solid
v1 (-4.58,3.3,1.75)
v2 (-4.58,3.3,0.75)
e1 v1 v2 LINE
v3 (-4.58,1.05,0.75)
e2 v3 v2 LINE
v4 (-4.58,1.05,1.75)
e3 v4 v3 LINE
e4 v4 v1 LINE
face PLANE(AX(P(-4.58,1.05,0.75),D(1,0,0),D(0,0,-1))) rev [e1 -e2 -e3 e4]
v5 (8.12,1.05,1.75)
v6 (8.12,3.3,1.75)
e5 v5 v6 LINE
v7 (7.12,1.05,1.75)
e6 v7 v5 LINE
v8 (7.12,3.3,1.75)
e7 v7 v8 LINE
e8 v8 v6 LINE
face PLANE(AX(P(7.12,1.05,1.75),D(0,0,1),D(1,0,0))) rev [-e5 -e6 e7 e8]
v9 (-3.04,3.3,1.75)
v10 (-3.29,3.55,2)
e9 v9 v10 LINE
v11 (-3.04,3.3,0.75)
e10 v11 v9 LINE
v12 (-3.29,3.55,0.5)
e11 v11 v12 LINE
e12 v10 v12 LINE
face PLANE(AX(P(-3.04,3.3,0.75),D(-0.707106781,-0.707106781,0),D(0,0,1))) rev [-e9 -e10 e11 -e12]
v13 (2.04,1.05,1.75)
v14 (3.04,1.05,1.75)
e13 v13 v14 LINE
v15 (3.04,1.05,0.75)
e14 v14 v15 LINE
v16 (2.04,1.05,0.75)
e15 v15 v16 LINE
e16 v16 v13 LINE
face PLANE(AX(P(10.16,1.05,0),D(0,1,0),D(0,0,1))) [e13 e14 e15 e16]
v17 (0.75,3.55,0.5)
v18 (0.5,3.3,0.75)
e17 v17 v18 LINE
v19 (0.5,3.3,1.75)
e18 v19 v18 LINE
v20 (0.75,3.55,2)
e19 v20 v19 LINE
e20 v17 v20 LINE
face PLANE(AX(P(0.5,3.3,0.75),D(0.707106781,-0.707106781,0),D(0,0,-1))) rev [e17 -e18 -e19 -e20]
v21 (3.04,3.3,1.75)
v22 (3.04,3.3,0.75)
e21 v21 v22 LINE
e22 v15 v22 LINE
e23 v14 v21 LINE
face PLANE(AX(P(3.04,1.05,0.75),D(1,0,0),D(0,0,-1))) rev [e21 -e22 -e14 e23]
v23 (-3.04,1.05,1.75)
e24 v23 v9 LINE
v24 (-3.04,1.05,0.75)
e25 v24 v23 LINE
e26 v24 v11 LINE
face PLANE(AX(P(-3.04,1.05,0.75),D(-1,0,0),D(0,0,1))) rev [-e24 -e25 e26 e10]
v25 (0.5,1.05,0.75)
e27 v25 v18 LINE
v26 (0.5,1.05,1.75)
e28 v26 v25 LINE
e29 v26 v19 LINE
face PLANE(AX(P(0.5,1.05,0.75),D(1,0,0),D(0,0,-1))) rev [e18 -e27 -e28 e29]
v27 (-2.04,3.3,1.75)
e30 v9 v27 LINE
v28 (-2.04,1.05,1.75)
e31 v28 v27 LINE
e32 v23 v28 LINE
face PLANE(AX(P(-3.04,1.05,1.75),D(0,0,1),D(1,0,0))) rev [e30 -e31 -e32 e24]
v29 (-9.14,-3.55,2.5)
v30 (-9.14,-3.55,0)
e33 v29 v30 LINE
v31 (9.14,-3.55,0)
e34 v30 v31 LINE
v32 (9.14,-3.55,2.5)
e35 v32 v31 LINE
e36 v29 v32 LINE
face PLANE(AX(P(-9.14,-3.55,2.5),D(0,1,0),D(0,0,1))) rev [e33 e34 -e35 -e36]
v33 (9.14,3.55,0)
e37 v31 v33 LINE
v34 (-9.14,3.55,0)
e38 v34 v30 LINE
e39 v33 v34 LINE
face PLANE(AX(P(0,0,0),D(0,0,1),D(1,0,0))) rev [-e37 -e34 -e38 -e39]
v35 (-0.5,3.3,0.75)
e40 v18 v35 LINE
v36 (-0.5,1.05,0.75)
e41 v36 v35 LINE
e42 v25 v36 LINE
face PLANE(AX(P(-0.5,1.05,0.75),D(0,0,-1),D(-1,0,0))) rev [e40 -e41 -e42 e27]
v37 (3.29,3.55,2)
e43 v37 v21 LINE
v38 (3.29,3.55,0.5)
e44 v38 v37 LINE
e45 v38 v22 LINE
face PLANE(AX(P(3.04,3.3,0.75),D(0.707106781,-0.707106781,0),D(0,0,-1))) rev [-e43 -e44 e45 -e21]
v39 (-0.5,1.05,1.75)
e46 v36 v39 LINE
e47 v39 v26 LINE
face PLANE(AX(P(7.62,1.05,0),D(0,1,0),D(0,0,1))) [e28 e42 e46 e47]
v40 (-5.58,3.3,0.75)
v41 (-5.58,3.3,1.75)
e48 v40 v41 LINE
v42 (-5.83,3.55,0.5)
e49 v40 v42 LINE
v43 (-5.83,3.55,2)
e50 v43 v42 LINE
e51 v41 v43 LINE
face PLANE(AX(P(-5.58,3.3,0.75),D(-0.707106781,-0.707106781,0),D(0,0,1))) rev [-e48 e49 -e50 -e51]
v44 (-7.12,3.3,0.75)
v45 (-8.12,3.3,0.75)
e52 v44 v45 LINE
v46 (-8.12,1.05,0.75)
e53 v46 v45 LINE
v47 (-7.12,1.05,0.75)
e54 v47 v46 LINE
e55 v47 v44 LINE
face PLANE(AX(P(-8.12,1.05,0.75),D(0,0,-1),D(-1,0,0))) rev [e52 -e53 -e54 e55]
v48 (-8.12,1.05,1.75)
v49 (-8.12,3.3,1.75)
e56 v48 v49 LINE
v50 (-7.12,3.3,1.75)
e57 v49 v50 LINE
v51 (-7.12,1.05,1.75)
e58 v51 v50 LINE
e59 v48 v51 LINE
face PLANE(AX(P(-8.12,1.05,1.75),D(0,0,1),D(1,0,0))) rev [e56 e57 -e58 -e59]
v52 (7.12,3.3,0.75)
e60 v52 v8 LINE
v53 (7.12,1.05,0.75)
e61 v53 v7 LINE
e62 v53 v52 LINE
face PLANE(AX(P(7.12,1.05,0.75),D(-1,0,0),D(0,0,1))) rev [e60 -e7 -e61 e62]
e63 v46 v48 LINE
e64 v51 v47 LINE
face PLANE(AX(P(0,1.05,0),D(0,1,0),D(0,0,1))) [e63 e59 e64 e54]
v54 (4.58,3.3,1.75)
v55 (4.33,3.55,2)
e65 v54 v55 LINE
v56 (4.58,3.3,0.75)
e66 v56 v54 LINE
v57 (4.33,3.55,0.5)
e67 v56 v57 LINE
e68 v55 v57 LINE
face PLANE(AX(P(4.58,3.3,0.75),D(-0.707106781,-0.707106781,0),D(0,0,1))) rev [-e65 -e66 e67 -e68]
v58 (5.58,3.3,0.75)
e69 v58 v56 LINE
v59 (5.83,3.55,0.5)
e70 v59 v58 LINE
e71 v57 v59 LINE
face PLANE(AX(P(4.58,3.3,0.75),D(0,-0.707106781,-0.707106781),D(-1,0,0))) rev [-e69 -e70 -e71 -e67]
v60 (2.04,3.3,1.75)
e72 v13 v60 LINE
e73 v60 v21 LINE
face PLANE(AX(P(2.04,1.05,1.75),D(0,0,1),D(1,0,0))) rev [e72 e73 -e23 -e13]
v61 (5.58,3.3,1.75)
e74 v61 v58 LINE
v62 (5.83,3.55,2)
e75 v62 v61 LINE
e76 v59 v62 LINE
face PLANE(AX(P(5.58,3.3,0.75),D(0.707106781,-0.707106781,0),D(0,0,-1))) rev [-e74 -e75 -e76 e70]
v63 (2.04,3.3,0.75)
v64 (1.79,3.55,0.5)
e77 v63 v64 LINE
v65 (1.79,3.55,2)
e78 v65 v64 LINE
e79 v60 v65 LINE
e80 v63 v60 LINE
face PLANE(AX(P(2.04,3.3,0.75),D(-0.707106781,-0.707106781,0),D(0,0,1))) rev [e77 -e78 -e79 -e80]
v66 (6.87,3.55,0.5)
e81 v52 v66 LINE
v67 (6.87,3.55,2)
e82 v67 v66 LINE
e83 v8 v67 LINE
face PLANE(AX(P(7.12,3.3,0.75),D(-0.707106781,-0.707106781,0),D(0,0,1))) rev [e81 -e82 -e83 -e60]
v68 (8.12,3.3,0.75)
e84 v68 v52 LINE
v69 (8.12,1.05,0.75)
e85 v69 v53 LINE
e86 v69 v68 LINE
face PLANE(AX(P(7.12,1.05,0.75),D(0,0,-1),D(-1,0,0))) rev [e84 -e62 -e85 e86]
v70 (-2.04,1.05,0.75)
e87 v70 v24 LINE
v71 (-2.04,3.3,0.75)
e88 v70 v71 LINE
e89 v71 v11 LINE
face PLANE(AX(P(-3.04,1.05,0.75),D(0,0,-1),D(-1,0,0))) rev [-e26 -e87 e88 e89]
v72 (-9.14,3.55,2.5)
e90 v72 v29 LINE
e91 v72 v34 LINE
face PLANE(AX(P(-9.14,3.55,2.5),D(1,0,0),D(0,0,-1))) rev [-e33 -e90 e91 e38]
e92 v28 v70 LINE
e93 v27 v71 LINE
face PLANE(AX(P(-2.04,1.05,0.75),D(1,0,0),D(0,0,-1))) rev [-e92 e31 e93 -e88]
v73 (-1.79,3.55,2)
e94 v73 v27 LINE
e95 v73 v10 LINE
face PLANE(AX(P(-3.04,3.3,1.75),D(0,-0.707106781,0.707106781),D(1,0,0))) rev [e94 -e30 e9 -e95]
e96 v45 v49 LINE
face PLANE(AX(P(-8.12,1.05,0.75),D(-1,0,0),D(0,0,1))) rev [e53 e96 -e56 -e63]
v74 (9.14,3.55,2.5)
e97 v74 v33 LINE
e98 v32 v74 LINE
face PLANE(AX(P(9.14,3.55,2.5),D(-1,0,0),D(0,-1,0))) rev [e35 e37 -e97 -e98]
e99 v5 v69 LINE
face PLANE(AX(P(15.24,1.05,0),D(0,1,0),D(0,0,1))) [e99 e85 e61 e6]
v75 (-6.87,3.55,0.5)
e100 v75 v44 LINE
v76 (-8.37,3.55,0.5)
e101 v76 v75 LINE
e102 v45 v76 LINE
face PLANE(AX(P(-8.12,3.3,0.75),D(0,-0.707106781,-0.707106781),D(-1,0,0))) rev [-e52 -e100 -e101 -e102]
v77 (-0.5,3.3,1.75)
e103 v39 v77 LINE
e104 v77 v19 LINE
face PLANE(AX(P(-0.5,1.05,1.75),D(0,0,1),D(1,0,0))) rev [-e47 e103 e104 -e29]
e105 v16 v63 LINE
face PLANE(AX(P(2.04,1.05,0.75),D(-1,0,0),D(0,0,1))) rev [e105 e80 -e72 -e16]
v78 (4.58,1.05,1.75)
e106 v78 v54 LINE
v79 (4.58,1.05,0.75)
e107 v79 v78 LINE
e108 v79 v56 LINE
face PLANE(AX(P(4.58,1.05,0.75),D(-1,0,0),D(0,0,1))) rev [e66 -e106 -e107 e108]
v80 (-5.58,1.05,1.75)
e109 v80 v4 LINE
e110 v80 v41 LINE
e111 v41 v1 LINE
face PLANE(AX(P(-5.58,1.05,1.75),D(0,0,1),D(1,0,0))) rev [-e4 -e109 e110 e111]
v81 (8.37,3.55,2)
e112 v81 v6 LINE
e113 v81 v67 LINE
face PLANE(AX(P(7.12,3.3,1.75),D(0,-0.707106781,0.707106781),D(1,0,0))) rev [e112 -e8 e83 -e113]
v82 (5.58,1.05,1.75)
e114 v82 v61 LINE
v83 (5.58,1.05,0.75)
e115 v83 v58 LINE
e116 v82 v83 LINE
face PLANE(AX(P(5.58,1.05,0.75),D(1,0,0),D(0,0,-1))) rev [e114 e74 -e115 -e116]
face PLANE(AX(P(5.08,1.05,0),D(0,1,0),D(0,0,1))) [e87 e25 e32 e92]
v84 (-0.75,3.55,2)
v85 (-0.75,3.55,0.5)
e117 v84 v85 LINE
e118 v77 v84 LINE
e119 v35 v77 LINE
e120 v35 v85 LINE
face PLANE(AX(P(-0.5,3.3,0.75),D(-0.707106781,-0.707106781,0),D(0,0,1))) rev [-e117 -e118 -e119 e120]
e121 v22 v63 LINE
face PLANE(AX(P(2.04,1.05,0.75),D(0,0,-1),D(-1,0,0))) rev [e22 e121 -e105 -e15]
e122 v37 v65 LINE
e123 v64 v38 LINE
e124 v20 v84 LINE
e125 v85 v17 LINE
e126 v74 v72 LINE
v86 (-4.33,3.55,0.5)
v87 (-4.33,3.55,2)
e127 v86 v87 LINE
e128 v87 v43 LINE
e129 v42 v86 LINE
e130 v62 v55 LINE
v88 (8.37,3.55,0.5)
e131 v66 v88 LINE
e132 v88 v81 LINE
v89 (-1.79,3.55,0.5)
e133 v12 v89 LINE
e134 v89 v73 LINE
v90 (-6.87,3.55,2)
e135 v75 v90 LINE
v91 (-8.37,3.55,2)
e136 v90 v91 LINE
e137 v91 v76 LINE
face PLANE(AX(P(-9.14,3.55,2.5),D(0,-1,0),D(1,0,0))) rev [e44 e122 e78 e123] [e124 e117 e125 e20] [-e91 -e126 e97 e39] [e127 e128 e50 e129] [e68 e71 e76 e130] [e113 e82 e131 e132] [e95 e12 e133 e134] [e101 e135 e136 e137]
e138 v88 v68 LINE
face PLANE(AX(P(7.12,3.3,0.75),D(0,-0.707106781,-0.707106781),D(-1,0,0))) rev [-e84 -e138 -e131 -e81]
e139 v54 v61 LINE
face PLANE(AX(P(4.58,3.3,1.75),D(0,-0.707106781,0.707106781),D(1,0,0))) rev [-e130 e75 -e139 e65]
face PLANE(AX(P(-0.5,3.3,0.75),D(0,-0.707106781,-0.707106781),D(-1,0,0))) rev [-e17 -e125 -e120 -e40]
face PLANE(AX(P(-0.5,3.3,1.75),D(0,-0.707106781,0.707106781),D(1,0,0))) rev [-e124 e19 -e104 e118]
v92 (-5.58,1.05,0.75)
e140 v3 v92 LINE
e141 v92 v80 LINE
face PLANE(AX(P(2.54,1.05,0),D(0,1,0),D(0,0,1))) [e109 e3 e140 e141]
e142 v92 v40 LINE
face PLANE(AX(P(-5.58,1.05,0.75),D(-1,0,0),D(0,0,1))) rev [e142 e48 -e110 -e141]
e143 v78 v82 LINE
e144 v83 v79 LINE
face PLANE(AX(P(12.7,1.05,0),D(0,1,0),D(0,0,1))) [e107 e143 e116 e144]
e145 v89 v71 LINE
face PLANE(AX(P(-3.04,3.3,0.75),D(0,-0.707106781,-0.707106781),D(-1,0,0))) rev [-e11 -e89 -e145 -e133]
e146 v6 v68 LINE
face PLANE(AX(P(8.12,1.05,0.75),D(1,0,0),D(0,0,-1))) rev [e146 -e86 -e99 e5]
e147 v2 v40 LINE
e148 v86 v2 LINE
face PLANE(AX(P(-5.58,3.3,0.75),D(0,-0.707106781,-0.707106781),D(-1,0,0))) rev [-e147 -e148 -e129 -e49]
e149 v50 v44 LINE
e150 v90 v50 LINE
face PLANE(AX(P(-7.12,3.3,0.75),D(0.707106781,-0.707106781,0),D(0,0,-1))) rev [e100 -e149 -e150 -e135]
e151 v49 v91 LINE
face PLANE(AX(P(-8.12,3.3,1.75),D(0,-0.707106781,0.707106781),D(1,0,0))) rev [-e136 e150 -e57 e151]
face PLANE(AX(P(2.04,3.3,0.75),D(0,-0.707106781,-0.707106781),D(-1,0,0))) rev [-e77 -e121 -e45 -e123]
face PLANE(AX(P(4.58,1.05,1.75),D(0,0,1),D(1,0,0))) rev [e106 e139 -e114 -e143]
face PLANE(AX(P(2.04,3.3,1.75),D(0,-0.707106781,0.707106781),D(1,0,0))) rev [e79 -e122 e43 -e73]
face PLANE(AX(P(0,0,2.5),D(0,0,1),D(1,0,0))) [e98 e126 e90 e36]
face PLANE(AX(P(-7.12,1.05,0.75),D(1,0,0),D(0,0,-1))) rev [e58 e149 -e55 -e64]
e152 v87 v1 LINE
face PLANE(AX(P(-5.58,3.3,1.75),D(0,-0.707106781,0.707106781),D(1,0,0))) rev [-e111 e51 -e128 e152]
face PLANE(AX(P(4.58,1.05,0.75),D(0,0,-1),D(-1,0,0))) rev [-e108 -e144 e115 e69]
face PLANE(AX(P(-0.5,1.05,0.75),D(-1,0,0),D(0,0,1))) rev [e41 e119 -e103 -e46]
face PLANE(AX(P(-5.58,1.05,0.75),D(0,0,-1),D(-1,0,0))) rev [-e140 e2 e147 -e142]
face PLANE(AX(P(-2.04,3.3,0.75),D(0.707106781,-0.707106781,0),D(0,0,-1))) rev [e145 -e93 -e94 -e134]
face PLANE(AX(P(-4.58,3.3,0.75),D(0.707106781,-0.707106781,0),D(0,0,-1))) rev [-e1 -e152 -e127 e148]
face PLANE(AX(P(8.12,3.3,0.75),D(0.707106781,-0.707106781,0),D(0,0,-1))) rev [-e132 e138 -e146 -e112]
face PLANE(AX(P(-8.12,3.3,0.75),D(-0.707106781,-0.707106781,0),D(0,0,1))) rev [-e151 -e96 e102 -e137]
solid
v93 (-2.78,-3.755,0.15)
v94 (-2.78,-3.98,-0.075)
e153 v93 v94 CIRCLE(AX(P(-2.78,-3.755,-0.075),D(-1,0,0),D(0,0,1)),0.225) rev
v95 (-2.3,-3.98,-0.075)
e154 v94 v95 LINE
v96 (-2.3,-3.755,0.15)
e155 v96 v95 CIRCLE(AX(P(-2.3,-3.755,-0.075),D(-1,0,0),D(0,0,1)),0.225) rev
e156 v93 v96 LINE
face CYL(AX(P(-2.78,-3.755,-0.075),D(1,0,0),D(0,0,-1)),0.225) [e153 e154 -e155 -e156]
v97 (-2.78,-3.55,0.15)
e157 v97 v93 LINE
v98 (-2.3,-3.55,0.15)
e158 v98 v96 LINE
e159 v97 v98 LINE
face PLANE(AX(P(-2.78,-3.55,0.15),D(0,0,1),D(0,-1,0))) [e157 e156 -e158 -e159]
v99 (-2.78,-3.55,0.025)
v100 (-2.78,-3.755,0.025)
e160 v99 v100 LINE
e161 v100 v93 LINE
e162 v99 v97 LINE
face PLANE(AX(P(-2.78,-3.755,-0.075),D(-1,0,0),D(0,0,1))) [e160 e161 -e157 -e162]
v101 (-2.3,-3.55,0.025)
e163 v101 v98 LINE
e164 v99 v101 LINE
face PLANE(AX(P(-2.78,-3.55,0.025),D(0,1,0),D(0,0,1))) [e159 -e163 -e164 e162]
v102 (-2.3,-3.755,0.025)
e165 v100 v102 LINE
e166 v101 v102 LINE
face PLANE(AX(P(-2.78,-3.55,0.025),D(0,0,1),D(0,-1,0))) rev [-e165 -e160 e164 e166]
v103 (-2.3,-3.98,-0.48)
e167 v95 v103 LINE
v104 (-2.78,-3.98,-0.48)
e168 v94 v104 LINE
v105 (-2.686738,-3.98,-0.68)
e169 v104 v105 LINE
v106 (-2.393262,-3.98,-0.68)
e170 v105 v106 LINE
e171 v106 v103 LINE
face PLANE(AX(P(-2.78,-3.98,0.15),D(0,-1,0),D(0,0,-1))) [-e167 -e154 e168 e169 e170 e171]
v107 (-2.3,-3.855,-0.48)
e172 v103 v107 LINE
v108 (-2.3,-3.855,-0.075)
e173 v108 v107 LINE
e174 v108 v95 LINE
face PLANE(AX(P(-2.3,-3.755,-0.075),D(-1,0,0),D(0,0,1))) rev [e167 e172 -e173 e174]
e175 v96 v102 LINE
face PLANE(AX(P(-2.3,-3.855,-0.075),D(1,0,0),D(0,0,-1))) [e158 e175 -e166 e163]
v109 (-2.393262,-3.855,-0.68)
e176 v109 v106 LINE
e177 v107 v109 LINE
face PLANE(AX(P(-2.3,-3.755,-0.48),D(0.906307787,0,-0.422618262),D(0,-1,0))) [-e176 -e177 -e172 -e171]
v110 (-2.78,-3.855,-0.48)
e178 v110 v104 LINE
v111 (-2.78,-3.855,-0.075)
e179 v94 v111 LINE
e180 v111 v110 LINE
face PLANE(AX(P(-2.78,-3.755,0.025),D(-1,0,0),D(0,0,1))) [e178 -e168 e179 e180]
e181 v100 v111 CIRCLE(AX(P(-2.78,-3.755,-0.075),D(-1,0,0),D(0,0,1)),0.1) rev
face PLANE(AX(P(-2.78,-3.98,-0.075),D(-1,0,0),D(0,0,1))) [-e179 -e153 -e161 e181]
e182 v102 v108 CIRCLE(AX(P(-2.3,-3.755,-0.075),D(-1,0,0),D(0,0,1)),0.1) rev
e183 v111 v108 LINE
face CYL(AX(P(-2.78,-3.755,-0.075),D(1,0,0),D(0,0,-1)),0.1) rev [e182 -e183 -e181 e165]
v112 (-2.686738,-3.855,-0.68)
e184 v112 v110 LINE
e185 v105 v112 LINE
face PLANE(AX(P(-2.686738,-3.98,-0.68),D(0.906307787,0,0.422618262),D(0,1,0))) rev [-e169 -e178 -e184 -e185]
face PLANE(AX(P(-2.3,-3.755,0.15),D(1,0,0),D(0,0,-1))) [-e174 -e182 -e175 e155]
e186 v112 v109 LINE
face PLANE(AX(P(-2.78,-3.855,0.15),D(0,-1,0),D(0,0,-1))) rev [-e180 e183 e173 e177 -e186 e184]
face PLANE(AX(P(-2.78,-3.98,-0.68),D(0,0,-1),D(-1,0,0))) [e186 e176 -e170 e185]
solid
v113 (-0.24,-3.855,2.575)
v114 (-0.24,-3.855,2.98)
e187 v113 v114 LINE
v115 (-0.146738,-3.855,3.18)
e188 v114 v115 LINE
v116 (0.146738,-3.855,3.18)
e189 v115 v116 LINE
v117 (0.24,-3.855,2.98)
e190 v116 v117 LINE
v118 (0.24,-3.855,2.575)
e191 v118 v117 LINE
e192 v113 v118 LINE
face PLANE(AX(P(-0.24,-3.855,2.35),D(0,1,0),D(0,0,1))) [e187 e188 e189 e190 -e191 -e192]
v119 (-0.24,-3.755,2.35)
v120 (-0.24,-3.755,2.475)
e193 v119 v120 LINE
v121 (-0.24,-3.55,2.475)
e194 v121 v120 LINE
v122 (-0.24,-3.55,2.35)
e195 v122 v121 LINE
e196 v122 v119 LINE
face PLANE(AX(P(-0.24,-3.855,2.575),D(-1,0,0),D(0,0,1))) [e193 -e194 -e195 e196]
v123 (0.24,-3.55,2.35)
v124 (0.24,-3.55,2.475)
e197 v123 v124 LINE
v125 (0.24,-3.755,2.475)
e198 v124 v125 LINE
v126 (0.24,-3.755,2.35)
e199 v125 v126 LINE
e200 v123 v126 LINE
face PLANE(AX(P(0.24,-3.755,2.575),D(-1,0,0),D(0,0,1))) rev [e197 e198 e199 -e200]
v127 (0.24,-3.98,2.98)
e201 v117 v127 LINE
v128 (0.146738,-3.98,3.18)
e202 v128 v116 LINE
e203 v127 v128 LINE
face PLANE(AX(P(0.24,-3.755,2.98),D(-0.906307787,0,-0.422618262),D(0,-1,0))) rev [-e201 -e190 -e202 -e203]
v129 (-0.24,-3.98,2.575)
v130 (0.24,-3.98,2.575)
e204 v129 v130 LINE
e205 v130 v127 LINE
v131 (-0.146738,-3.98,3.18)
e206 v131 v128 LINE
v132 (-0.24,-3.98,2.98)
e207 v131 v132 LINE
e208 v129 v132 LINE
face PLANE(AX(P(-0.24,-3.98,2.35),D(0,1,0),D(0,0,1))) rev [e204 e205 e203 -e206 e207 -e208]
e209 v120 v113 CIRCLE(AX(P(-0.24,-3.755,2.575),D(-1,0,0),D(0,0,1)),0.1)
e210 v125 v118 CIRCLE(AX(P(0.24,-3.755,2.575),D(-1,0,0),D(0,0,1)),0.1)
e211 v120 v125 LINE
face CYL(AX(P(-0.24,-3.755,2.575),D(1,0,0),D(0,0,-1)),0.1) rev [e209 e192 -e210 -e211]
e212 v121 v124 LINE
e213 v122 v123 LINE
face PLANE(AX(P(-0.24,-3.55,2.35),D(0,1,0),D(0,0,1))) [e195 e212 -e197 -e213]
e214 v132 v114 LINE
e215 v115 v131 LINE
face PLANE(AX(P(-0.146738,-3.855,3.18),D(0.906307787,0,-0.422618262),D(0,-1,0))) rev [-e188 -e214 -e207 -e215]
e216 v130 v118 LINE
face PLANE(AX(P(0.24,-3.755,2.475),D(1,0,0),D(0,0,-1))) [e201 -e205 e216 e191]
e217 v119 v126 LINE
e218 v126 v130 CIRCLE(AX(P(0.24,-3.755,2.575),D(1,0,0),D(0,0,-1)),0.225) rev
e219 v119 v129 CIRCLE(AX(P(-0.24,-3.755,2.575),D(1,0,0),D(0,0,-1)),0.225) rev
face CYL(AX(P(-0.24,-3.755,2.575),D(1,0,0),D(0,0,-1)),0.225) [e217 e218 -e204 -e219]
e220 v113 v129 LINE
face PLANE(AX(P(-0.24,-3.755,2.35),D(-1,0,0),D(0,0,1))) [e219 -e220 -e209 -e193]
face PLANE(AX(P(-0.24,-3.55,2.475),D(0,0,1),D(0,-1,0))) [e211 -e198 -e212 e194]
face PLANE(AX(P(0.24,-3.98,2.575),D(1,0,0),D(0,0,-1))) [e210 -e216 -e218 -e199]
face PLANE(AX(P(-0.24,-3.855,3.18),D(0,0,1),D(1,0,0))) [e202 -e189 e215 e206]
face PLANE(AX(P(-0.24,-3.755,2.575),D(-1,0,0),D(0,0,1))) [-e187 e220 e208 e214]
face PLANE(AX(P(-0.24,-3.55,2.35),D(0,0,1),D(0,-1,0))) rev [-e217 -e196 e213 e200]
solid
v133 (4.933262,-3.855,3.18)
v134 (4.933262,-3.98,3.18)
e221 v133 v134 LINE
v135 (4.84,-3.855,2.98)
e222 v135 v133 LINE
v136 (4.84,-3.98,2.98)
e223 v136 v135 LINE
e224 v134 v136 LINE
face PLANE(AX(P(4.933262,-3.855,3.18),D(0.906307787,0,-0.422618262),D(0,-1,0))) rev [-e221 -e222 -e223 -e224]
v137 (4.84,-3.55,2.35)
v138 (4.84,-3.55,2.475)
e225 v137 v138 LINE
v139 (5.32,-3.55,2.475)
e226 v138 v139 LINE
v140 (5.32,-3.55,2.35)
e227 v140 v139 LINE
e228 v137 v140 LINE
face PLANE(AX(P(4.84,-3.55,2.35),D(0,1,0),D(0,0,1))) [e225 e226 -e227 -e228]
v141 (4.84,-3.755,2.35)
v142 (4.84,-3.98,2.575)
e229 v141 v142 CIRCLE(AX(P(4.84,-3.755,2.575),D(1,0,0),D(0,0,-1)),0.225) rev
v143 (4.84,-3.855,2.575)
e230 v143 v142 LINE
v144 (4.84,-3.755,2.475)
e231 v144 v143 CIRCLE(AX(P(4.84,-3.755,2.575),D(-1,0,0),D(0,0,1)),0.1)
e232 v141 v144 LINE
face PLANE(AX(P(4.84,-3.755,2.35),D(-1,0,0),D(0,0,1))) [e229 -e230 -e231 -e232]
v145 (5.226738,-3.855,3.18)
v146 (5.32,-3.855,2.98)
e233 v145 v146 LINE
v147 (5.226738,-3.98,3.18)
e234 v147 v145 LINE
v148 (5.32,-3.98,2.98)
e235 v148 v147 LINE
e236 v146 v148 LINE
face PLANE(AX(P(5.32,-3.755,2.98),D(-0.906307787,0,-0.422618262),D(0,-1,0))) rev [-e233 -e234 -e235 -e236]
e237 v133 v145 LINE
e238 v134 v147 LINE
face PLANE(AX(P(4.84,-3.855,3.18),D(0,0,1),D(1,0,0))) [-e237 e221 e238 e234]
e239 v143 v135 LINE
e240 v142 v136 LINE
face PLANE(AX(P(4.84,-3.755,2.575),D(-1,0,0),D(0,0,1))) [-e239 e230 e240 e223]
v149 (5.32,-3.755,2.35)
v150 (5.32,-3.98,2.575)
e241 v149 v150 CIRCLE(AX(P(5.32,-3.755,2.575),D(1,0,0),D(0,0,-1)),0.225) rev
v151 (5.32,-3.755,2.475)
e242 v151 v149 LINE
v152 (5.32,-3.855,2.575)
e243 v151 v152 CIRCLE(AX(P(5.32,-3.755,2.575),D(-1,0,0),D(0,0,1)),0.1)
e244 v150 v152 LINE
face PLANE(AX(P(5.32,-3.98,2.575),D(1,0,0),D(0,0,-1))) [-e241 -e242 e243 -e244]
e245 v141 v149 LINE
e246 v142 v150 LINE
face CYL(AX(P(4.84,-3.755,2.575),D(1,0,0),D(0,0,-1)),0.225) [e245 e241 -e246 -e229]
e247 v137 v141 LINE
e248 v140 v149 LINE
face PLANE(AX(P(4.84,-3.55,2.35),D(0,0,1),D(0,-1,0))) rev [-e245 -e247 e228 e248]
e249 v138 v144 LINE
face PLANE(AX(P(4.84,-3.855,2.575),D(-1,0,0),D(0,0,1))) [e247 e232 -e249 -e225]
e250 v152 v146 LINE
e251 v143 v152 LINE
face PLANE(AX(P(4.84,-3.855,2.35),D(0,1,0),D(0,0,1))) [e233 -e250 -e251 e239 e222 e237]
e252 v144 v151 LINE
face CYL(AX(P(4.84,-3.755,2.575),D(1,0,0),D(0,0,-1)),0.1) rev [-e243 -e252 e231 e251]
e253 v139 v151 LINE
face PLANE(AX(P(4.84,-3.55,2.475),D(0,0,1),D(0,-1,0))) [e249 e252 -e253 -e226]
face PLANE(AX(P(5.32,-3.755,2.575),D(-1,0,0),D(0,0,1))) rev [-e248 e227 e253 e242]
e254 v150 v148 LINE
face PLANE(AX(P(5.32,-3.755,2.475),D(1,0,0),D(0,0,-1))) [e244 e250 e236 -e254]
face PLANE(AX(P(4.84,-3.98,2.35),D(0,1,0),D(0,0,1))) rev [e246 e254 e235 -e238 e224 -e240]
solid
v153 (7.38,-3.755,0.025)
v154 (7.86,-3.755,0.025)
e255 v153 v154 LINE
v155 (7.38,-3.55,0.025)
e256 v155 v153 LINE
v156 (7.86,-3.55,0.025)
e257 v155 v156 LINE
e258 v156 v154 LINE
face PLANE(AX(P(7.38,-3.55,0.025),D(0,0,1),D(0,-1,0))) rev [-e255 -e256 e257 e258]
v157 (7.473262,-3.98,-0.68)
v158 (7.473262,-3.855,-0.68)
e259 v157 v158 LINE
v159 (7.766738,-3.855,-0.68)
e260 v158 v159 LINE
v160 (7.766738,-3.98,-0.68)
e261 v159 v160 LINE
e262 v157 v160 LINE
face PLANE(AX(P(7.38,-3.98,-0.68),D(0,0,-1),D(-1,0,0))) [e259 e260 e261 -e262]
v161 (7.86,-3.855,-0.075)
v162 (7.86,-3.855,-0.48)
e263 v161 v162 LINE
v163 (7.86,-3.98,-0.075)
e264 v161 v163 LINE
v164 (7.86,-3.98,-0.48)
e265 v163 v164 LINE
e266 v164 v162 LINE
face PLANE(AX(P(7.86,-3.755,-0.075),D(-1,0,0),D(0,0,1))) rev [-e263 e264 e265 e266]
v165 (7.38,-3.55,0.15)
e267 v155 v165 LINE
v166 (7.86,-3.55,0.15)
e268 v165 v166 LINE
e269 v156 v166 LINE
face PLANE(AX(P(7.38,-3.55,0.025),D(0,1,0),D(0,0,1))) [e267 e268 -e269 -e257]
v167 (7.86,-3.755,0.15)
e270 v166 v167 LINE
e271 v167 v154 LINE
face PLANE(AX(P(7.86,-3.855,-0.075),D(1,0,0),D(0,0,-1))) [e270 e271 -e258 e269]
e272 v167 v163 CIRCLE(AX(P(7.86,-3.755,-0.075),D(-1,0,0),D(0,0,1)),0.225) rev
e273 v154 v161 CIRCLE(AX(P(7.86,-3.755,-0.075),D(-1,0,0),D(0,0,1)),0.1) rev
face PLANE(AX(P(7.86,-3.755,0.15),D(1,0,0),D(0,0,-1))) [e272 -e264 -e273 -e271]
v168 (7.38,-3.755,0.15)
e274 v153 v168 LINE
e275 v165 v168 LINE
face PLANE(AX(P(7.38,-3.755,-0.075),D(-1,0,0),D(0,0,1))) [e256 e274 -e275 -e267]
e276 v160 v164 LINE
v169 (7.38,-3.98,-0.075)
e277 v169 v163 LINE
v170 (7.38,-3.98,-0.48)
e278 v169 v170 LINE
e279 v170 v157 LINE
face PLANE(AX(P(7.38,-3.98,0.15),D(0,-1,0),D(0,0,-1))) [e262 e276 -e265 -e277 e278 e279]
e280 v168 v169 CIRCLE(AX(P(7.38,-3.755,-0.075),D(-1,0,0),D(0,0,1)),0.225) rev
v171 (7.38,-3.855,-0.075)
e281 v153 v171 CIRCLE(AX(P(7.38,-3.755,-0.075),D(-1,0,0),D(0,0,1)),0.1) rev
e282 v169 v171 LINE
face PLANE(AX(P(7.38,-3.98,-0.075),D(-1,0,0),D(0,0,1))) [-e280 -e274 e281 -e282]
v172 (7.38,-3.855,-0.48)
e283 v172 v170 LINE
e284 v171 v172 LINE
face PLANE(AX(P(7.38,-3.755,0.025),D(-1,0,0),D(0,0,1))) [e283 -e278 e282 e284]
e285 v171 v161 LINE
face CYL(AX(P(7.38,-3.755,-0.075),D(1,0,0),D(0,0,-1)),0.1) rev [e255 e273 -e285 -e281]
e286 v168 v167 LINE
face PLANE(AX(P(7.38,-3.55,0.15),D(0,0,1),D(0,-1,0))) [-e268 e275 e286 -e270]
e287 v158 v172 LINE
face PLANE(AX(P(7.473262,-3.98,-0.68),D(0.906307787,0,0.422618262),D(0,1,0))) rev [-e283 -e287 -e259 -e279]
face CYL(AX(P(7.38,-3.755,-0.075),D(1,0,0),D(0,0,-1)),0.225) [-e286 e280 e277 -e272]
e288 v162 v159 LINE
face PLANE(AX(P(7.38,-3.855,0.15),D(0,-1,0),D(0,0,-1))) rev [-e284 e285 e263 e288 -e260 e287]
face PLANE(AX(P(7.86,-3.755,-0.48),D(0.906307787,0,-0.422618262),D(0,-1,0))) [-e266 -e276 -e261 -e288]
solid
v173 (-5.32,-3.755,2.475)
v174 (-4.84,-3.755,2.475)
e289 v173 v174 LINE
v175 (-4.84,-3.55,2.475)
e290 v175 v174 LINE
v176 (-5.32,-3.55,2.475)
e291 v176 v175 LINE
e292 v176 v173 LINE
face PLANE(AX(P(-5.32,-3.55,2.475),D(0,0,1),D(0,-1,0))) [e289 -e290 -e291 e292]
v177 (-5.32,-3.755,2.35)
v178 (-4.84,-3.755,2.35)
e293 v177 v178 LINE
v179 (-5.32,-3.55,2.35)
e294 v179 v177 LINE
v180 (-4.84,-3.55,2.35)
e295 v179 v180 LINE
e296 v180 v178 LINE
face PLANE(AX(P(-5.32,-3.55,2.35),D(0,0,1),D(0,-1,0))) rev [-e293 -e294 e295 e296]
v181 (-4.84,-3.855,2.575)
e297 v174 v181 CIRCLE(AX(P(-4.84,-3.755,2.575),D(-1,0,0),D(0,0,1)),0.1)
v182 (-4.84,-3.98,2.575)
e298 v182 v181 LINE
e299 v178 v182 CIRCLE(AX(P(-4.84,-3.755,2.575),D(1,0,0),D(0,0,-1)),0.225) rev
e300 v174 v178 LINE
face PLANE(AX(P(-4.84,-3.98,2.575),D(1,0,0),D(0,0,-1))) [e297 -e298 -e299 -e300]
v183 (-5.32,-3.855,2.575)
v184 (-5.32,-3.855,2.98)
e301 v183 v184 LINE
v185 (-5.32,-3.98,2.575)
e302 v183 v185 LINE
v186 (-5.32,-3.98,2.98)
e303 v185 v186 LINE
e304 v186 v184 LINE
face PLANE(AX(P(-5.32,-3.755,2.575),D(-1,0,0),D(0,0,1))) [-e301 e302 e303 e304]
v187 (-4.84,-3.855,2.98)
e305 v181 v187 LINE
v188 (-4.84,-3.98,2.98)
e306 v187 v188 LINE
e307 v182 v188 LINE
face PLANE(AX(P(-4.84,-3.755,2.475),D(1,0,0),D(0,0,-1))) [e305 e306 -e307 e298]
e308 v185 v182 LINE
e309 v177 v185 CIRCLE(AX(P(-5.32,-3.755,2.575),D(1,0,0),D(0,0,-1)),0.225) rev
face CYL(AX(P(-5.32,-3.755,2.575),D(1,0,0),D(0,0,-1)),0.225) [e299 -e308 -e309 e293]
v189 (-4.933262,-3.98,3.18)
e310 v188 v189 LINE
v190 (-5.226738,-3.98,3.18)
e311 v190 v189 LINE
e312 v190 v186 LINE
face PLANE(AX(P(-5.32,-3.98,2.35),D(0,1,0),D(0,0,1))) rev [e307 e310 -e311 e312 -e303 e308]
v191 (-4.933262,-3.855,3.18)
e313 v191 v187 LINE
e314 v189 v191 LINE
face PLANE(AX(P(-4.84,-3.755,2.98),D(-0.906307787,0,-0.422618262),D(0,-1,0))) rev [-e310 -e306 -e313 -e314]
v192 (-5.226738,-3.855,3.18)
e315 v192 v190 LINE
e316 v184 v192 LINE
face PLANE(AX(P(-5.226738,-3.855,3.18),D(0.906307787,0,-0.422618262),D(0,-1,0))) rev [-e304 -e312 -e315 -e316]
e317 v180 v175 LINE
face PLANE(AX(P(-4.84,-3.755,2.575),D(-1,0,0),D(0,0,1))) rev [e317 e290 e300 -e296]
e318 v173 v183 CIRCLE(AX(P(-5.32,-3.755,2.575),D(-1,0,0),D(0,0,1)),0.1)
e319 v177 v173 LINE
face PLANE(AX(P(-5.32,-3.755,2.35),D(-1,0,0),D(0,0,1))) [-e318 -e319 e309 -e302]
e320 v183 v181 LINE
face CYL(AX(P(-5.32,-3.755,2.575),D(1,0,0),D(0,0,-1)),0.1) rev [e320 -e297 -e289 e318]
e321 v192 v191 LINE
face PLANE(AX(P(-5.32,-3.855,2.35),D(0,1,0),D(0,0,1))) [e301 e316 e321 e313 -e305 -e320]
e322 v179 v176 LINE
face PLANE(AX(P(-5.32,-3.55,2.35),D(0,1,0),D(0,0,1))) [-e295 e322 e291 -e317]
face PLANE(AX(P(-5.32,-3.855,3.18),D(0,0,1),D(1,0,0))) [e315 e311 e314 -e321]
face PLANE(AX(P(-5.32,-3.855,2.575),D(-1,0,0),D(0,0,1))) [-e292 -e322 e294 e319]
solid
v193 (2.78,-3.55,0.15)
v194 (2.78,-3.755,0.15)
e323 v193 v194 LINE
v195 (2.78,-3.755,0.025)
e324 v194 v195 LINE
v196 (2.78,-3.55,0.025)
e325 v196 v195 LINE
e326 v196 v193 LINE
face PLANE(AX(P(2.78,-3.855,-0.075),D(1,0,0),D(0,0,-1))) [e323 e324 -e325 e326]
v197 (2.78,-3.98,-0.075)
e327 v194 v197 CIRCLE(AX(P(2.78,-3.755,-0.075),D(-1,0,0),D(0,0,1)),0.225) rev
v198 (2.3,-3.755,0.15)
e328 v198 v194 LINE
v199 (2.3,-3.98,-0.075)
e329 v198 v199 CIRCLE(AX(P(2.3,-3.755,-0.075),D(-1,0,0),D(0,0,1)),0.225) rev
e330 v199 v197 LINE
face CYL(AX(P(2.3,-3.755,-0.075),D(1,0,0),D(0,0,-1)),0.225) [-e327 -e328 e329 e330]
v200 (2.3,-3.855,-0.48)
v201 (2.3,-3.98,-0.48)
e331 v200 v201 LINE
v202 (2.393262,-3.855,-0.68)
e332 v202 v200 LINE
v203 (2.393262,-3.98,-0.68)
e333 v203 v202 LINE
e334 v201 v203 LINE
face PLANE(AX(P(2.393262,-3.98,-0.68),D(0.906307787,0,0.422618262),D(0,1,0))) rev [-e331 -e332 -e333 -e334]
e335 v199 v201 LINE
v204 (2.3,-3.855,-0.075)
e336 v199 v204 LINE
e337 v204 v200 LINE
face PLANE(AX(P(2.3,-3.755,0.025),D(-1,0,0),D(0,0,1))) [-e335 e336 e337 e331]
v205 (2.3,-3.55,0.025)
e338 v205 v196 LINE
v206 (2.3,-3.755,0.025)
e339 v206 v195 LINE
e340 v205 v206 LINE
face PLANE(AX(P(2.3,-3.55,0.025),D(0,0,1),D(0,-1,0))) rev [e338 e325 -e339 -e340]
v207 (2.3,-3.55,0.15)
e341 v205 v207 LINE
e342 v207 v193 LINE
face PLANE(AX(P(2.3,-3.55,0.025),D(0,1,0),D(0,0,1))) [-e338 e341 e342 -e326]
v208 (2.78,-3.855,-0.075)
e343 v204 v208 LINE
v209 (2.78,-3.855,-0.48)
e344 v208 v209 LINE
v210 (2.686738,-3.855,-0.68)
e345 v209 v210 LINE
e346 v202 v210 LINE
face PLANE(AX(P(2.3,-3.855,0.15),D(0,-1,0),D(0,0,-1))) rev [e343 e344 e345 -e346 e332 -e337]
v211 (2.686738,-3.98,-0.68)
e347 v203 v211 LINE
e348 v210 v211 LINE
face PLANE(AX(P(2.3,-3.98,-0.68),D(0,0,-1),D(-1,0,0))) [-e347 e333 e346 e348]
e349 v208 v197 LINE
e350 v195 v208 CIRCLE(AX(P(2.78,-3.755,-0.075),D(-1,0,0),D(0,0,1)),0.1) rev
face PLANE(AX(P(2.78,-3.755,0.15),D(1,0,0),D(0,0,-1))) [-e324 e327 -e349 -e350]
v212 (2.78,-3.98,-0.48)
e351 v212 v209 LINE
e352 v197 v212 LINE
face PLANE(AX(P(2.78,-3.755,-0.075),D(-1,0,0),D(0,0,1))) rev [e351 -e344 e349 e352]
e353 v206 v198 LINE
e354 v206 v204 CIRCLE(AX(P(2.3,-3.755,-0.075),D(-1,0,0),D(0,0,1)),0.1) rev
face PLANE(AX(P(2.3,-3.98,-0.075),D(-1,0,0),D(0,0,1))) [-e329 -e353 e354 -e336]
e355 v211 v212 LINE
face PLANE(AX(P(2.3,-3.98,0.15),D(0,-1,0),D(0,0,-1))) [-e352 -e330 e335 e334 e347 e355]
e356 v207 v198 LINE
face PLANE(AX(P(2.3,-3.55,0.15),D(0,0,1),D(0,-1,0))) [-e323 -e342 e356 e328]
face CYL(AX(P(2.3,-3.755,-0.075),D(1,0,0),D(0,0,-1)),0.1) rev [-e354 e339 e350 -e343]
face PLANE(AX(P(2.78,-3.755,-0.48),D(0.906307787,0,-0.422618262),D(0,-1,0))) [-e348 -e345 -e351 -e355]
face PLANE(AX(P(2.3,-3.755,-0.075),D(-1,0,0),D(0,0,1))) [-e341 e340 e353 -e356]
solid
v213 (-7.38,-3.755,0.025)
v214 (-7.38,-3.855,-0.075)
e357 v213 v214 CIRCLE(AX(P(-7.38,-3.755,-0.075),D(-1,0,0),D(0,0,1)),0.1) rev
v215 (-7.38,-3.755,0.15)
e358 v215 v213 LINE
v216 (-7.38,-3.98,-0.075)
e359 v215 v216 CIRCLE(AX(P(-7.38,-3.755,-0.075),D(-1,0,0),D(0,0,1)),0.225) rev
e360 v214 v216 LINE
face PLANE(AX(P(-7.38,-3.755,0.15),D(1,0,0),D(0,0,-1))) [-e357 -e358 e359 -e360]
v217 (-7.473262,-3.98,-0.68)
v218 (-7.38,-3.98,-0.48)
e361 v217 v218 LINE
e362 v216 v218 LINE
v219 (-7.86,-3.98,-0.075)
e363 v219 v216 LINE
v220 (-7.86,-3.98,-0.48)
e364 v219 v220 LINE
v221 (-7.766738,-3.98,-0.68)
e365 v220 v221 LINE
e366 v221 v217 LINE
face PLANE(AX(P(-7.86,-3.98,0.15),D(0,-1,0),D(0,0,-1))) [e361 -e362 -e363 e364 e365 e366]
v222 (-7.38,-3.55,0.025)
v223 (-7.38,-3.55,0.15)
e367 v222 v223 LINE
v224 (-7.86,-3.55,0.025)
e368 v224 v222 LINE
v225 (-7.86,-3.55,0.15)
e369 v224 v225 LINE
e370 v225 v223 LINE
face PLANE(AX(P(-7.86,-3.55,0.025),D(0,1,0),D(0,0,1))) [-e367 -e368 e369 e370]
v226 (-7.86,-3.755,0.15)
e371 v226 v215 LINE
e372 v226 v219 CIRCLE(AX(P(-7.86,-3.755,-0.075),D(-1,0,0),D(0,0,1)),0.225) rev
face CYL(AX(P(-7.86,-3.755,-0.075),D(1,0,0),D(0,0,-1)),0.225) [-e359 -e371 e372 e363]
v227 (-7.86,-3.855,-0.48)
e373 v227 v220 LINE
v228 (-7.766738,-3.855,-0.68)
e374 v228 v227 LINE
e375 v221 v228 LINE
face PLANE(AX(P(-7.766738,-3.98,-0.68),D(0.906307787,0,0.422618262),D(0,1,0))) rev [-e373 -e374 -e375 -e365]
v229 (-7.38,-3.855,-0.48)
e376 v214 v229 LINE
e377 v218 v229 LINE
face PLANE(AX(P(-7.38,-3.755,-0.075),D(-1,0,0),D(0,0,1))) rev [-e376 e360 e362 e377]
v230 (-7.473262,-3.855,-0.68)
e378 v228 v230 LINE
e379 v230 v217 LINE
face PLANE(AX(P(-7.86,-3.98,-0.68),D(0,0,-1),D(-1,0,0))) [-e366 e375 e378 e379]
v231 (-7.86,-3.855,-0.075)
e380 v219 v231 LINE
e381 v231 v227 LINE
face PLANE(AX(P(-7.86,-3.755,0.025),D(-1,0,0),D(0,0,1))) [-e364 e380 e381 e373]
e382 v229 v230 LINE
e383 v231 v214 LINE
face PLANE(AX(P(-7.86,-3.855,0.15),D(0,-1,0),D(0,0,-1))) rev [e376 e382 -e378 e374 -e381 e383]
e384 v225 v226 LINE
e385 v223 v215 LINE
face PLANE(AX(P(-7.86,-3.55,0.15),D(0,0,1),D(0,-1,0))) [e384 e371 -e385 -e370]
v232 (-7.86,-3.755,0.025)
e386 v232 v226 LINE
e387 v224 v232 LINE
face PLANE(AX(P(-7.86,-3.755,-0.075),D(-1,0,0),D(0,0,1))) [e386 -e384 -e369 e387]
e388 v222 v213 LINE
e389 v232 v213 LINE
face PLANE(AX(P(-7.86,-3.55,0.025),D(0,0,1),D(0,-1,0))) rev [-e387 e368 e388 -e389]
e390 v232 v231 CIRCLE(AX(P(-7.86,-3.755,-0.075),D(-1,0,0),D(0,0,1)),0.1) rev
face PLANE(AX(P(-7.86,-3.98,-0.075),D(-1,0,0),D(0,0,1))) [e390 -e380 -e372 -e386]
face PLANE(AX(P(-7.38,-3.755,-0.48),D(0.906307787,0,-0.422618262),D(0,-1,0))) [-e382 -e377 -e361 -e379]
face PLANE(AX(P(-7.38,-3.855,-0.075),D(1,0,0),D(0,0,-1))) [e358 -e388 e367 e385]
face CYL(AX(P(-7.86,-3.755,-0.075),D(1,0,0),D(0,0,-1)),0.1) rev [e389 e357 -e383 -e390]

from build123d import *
from OCP.BRepFilletAPI import BRepFilletAPI_MakeChamfer

# Parameters (mm, degrees)
SKETCH1_W                  = 18.28
SKETCH1_H                  = 7.1
BOSS_EXTRUDE1_DEPTH        = 2.5
SKETCH2_W                  = 1
SKETCH2_H                  = 1
CUT_EXTRUDE1_DEPTH         = 2.5
CHAMFER1_SIZE              = 0.25
LPATTERN6_COUNT            = 7
LPATTERN6_PITCH            = 2.54
CHAMFER1_OF_LPATTERN6_SIZE = 0.25
BASE_FLANGE2_DEPTH         = 0.24
BASE_FLANGE2_DEPTH_BACK    = 0.24
BASE_FLANGE3_DEPTH         = 0.24
BASE_FLANGE3_DEPTH_BACK    = 0.24
CHAMFER3_SIZE              = 0.2
CHAMFER3_SIZE2             = 0.093261532
CHAMFER4_SIZE              = 0.2
CHAMFER4_SIZE2             = 0.093261532
LPATTERN4_COUNT            = 4
LPATTERN4_PITCH            = 5.08
LPATTERN3_COUNT            = 3
LPATTERN3_PITCH            = 5.08


# Sheet-metal steps are written as plain solids
with BuildPart() as part:
    # Sketch1 → Boss-Extrude1 (new body)
    with BuildSketch(Plane.XY):
        Rectangle(SKETCH1_W, SKETCH1_H)
    extrude(amount=BOSS_EXTRUDE1_DEPTH)

    # Sketch2 → Cut-Extrude1 (cut)
    with BuildSketch(Plane(origin=(0, 3.55, 0), x_dir=(1, 0, 0), z_dir=(0, 1, 0))):
        with Locations((-7.62, -1.25)):
            Rectangle(SKETCH2_W, SKETCH2_H)
    cut_extrude1 = extrude(amount=-CUT_EXTRUDE1_DEPTH, mode=Mode.SUBTRACT)

    # Chamfer1
    chamfer1_edges = [part.edges().sort_by_distance(p)[0] for p in [
        (-7.12, 3.55, 1.25),
        (-7.62, 3.55, 0.75),
        (-8.12, 3.55, 1.25),
        (-7.62, 3.55, 1.75),
    ]]
    chamfer(chamfer1_edges, length=CHAMFER1_SIZE)

    # LPattern6: Cut-Extrude1 ×7
    with Locations(*[(i * LPATTERN6_PITCH, 0, 0) for i in range(1, LPATTERN6_COUNT)]):
        add(cut_extrude1, mode=Mode.SUBTRACT)

    # Chamfer1 of LPattern6
    chamfer1_of_lpattern6_edges = [part.edges().sort_by_distance(p)[0] for p in [
        (-4.58, 3.55, 1.25),
        (-5.08, 3.55, 0.75),
        (-5.58, 3.55, 1.25),
        (-5.08, 3.55, 1.75),
        (-2.04, 3.55, 1.25),
        (-2.54, 3.55, 0.75),
        (-3.04, 3.55, 1.25),
        (-2.54, 3.55, 1.75),
        (0.5, 3.55, 1.25),
        (0, 3.55, 0.75),
        (-0.5, 3.55, 1.25),
        (0, 3.55, 1.75),
        (3.04, 3.55, 1.25),
        (2.54, 3.55, 0.75),
        (2.04, 3.55, 1.25),
        (2.54, 3.55, 1.75),
        (5.58, 3.55, 1.25),
        (5.08, 3.55, 0.75),
        (4.58, 3.55, 1.25),
        (5.08, 3.55, 1.75),
        (8.12, 3.55, 1.25),
        (7.62, 3.55, 0.75),
        (7.12, 3.55, 1.25),
        (7.62, 3.55, 1.75),
    ]]
    chamfer(chamfer1_of_lpattern6_edges, length=CHAMFER1_OF_LPATTERN6_SIZE)


with BuildPart() as body_2:
    # Sketch5 → Base-Flange2 (new, two sides: drawn at the far end of the back side and taken through both)
    with BuildSketch(Plane.ZY.offset(7.62).offset(-BASE_FLANGE2_DEPTH_BACK)):
        with BuildLine():
            Line((0.15, -3.55), (0.15, -3.755))
            ThreePointArc((0.15, -3.755), (0.084099026, -3.914099026), (-0.075, -3.98))
            Line((-0.075, -3.98), (-0.68, -3.98))
            Line((-0.68, -3.98), (-0.68, -3.855))
            Line((-0.68, -3.855), (-0.075, -3.855))
            ThreePointArc((-0.075, -3.855), (-0.004289322, -3.825710678), (0.025, -3.755))
            Line((0.025, -3.755), (0.025, -3.55))
            Line((0.025, -3.55), (0.15, -3.55))
        make_face()
    extrude(amount=BASE_FLANGE2_DEPTH + BASE_FLANGE2_DEPTH_BACK)

    # Chamfer4: one chamfer whose edges measure the first distance from different faces: ONE call of the kernel's chamfer builder (chamfer() names one face for all edges)
    chamfer4_edges_1 = [body_2.edges().sort_by_distance(p)[0] for p in [
        (-7.38, -3.9175, -0.68),
    ]]
    chamfer4_side_1 = [body_2.faces().sort_by_distance(p)[0] for p in [
        (-7.38, -3.6525, 0.034347727),
    ]]
    chamfer4_edges_2 = [body_2.edges().sort_by_distance(p)[0] for p in [
        (-7.86, -3.9175, -0.68),
    ]]
    chamfer4_side_2 = [body_2.faces().sort_by_distance(p)[0] for p in [
        (-7.86, -3.6525, 0.034347727),
    ]]
    chamfer4 = BRepFilletAPI_MakeChamfer(body_2.part.solid().wrapped)
    for e in chamfer4_edges_1:
        chamfer4.Add(CHAMFER4_SIZE, CHAMFER4_SIZE2, e.wrapped, chamfer4_side_1[0].wrapped)  # the first distance lies on this face
    for e in chamfer4_edges_2:
        chamfer4.Add(CHAMFER4_SIZE, CHAMFER4_SIZE2, e.wrapped, chamfer4_side_2[0].wrapped)  # the first distance lies on this face
    add(Compound.cast(chamfer4.Shape()), mode=Mode.REPLACE)


with BuildPart() as body_3:
    # Sketch22 → Base-Flange3 (new, two sides: drawn at the far end of the back side and taken through both)
    with BuildSketch(Plane.ZY.offset(5.08).offset(-BASE_FLANGE3_DEPTH_BACK)):
        with BuildLine():
            Line((2.35, -3.55), (2.35, -3.755))
            ThreePointArc((2.35, -3.755), (2.415900974, -3.914099026), (2.575, -3.98))
            Line((2.575, -3.98), (3.18, -3.98))
            Line((3.18, -3.98), (3.18, -3.855))
            Line((3.18, -3.855), (2.575, -3.855))
            ThreePointArc((2.575, -3.855), (2.504289322, -3.825710678), (2.475, -3.755))
            Line((2.475, -3.755), (2.475, -3.55))
            Line((2.475, -3.55), (2.35, -3.55))
        make_face()
    extrude(amount=BASE_FLANGE3_DEPTH + BASE_FLANGE3_DEPTH_BACK)

    # Chamfer3: one chamfer whose edges measure the first distance from different faces: ONE call of the kernel's chamfer builder (chamfer() names one face for all edges)
    chamfer3_edges_1 = [body_3.edges().sort_by_distance(p)[0] for p in [
        (-4.84, -3.9175, 3.18),
    ]]
    chamfer3_side_1 = [body_3.faces().sort_by_distance(p)[0] for p in [
        (-4.84, -3.6525, 2.465652273),
    ]]
    chamfer3_edges_2 = [body_3.edges().sort_by_distance(p)[0] for p in [
        (-5.32, -3.9175, 3.18),
    ]]
    chamfer3_side_2 = [body_3.faces().sort_by_distance(p)[0] for p in [
        (-5.32, -3.6525, 2.465652273),
    ]]
    chamfer3 = BRepFilletAPI_MakeChamfer(body_3.part.solid().wrapped)
    for e in chamfer3_edges_1:
        chamfer3.Add(CHAMFER3_SIZE, CHAMFER3_SIZE2, e.wrapped, chamfer3_side_1[0].wrapped)  # the first distance lies on this face
    for e in chamfer3_edges_2:
        chamfer3.Add(CHAMFER3_SIZE, CHAMFER3_SIZE2, e.wrapped, chamfer3_side_2[0].wrapped)  # the first distance lies on this face
    add(Compound.cast(chamfer3.Shape()), mode=Mode.REPLACE)


with BuildPart() as lpattern4_1:
    # LPattern4: pattern copy
    add(body_2.part.moved(Location(Vector(1, 0, 0) * (1 * LPATTERN4_PITCH))))


with BuildPart() as lpattern4_2:
    # LPattern4: pattern copy
    add(body_2.part.moved(Location(Vector(1, 0, 0) * (2 * LPATTERN4_PITCH))))


with BuildPart() as lpattern4_3:
    # LPattern4: pattern copy
    add(body_2.part.moved(Location(Vector(1, 0, 0) * (3 * LPATTERN4_PITCH))))


with BuildPart() as lpattern3_1:
    # LPattern3: pattern copy
    add(body_3.part.moved(Location(Vector(1, 0, 0) * (1 * LPATTERN3_PITCH))))


with BuildPart() as lpattern3_2:
    # LPattern3: pattern copy
    add(body_3.part.moved(Location(Vector(1, 0, 0) * (2 * LPATTERN3_PITCH))))


solid = Compound([part.part, body_2.part, body_3.part, lpattern4_1.part, lpattern4_2.part, lpattern4_3.part, lpattern3_1.part, lpattern3_2.part])
